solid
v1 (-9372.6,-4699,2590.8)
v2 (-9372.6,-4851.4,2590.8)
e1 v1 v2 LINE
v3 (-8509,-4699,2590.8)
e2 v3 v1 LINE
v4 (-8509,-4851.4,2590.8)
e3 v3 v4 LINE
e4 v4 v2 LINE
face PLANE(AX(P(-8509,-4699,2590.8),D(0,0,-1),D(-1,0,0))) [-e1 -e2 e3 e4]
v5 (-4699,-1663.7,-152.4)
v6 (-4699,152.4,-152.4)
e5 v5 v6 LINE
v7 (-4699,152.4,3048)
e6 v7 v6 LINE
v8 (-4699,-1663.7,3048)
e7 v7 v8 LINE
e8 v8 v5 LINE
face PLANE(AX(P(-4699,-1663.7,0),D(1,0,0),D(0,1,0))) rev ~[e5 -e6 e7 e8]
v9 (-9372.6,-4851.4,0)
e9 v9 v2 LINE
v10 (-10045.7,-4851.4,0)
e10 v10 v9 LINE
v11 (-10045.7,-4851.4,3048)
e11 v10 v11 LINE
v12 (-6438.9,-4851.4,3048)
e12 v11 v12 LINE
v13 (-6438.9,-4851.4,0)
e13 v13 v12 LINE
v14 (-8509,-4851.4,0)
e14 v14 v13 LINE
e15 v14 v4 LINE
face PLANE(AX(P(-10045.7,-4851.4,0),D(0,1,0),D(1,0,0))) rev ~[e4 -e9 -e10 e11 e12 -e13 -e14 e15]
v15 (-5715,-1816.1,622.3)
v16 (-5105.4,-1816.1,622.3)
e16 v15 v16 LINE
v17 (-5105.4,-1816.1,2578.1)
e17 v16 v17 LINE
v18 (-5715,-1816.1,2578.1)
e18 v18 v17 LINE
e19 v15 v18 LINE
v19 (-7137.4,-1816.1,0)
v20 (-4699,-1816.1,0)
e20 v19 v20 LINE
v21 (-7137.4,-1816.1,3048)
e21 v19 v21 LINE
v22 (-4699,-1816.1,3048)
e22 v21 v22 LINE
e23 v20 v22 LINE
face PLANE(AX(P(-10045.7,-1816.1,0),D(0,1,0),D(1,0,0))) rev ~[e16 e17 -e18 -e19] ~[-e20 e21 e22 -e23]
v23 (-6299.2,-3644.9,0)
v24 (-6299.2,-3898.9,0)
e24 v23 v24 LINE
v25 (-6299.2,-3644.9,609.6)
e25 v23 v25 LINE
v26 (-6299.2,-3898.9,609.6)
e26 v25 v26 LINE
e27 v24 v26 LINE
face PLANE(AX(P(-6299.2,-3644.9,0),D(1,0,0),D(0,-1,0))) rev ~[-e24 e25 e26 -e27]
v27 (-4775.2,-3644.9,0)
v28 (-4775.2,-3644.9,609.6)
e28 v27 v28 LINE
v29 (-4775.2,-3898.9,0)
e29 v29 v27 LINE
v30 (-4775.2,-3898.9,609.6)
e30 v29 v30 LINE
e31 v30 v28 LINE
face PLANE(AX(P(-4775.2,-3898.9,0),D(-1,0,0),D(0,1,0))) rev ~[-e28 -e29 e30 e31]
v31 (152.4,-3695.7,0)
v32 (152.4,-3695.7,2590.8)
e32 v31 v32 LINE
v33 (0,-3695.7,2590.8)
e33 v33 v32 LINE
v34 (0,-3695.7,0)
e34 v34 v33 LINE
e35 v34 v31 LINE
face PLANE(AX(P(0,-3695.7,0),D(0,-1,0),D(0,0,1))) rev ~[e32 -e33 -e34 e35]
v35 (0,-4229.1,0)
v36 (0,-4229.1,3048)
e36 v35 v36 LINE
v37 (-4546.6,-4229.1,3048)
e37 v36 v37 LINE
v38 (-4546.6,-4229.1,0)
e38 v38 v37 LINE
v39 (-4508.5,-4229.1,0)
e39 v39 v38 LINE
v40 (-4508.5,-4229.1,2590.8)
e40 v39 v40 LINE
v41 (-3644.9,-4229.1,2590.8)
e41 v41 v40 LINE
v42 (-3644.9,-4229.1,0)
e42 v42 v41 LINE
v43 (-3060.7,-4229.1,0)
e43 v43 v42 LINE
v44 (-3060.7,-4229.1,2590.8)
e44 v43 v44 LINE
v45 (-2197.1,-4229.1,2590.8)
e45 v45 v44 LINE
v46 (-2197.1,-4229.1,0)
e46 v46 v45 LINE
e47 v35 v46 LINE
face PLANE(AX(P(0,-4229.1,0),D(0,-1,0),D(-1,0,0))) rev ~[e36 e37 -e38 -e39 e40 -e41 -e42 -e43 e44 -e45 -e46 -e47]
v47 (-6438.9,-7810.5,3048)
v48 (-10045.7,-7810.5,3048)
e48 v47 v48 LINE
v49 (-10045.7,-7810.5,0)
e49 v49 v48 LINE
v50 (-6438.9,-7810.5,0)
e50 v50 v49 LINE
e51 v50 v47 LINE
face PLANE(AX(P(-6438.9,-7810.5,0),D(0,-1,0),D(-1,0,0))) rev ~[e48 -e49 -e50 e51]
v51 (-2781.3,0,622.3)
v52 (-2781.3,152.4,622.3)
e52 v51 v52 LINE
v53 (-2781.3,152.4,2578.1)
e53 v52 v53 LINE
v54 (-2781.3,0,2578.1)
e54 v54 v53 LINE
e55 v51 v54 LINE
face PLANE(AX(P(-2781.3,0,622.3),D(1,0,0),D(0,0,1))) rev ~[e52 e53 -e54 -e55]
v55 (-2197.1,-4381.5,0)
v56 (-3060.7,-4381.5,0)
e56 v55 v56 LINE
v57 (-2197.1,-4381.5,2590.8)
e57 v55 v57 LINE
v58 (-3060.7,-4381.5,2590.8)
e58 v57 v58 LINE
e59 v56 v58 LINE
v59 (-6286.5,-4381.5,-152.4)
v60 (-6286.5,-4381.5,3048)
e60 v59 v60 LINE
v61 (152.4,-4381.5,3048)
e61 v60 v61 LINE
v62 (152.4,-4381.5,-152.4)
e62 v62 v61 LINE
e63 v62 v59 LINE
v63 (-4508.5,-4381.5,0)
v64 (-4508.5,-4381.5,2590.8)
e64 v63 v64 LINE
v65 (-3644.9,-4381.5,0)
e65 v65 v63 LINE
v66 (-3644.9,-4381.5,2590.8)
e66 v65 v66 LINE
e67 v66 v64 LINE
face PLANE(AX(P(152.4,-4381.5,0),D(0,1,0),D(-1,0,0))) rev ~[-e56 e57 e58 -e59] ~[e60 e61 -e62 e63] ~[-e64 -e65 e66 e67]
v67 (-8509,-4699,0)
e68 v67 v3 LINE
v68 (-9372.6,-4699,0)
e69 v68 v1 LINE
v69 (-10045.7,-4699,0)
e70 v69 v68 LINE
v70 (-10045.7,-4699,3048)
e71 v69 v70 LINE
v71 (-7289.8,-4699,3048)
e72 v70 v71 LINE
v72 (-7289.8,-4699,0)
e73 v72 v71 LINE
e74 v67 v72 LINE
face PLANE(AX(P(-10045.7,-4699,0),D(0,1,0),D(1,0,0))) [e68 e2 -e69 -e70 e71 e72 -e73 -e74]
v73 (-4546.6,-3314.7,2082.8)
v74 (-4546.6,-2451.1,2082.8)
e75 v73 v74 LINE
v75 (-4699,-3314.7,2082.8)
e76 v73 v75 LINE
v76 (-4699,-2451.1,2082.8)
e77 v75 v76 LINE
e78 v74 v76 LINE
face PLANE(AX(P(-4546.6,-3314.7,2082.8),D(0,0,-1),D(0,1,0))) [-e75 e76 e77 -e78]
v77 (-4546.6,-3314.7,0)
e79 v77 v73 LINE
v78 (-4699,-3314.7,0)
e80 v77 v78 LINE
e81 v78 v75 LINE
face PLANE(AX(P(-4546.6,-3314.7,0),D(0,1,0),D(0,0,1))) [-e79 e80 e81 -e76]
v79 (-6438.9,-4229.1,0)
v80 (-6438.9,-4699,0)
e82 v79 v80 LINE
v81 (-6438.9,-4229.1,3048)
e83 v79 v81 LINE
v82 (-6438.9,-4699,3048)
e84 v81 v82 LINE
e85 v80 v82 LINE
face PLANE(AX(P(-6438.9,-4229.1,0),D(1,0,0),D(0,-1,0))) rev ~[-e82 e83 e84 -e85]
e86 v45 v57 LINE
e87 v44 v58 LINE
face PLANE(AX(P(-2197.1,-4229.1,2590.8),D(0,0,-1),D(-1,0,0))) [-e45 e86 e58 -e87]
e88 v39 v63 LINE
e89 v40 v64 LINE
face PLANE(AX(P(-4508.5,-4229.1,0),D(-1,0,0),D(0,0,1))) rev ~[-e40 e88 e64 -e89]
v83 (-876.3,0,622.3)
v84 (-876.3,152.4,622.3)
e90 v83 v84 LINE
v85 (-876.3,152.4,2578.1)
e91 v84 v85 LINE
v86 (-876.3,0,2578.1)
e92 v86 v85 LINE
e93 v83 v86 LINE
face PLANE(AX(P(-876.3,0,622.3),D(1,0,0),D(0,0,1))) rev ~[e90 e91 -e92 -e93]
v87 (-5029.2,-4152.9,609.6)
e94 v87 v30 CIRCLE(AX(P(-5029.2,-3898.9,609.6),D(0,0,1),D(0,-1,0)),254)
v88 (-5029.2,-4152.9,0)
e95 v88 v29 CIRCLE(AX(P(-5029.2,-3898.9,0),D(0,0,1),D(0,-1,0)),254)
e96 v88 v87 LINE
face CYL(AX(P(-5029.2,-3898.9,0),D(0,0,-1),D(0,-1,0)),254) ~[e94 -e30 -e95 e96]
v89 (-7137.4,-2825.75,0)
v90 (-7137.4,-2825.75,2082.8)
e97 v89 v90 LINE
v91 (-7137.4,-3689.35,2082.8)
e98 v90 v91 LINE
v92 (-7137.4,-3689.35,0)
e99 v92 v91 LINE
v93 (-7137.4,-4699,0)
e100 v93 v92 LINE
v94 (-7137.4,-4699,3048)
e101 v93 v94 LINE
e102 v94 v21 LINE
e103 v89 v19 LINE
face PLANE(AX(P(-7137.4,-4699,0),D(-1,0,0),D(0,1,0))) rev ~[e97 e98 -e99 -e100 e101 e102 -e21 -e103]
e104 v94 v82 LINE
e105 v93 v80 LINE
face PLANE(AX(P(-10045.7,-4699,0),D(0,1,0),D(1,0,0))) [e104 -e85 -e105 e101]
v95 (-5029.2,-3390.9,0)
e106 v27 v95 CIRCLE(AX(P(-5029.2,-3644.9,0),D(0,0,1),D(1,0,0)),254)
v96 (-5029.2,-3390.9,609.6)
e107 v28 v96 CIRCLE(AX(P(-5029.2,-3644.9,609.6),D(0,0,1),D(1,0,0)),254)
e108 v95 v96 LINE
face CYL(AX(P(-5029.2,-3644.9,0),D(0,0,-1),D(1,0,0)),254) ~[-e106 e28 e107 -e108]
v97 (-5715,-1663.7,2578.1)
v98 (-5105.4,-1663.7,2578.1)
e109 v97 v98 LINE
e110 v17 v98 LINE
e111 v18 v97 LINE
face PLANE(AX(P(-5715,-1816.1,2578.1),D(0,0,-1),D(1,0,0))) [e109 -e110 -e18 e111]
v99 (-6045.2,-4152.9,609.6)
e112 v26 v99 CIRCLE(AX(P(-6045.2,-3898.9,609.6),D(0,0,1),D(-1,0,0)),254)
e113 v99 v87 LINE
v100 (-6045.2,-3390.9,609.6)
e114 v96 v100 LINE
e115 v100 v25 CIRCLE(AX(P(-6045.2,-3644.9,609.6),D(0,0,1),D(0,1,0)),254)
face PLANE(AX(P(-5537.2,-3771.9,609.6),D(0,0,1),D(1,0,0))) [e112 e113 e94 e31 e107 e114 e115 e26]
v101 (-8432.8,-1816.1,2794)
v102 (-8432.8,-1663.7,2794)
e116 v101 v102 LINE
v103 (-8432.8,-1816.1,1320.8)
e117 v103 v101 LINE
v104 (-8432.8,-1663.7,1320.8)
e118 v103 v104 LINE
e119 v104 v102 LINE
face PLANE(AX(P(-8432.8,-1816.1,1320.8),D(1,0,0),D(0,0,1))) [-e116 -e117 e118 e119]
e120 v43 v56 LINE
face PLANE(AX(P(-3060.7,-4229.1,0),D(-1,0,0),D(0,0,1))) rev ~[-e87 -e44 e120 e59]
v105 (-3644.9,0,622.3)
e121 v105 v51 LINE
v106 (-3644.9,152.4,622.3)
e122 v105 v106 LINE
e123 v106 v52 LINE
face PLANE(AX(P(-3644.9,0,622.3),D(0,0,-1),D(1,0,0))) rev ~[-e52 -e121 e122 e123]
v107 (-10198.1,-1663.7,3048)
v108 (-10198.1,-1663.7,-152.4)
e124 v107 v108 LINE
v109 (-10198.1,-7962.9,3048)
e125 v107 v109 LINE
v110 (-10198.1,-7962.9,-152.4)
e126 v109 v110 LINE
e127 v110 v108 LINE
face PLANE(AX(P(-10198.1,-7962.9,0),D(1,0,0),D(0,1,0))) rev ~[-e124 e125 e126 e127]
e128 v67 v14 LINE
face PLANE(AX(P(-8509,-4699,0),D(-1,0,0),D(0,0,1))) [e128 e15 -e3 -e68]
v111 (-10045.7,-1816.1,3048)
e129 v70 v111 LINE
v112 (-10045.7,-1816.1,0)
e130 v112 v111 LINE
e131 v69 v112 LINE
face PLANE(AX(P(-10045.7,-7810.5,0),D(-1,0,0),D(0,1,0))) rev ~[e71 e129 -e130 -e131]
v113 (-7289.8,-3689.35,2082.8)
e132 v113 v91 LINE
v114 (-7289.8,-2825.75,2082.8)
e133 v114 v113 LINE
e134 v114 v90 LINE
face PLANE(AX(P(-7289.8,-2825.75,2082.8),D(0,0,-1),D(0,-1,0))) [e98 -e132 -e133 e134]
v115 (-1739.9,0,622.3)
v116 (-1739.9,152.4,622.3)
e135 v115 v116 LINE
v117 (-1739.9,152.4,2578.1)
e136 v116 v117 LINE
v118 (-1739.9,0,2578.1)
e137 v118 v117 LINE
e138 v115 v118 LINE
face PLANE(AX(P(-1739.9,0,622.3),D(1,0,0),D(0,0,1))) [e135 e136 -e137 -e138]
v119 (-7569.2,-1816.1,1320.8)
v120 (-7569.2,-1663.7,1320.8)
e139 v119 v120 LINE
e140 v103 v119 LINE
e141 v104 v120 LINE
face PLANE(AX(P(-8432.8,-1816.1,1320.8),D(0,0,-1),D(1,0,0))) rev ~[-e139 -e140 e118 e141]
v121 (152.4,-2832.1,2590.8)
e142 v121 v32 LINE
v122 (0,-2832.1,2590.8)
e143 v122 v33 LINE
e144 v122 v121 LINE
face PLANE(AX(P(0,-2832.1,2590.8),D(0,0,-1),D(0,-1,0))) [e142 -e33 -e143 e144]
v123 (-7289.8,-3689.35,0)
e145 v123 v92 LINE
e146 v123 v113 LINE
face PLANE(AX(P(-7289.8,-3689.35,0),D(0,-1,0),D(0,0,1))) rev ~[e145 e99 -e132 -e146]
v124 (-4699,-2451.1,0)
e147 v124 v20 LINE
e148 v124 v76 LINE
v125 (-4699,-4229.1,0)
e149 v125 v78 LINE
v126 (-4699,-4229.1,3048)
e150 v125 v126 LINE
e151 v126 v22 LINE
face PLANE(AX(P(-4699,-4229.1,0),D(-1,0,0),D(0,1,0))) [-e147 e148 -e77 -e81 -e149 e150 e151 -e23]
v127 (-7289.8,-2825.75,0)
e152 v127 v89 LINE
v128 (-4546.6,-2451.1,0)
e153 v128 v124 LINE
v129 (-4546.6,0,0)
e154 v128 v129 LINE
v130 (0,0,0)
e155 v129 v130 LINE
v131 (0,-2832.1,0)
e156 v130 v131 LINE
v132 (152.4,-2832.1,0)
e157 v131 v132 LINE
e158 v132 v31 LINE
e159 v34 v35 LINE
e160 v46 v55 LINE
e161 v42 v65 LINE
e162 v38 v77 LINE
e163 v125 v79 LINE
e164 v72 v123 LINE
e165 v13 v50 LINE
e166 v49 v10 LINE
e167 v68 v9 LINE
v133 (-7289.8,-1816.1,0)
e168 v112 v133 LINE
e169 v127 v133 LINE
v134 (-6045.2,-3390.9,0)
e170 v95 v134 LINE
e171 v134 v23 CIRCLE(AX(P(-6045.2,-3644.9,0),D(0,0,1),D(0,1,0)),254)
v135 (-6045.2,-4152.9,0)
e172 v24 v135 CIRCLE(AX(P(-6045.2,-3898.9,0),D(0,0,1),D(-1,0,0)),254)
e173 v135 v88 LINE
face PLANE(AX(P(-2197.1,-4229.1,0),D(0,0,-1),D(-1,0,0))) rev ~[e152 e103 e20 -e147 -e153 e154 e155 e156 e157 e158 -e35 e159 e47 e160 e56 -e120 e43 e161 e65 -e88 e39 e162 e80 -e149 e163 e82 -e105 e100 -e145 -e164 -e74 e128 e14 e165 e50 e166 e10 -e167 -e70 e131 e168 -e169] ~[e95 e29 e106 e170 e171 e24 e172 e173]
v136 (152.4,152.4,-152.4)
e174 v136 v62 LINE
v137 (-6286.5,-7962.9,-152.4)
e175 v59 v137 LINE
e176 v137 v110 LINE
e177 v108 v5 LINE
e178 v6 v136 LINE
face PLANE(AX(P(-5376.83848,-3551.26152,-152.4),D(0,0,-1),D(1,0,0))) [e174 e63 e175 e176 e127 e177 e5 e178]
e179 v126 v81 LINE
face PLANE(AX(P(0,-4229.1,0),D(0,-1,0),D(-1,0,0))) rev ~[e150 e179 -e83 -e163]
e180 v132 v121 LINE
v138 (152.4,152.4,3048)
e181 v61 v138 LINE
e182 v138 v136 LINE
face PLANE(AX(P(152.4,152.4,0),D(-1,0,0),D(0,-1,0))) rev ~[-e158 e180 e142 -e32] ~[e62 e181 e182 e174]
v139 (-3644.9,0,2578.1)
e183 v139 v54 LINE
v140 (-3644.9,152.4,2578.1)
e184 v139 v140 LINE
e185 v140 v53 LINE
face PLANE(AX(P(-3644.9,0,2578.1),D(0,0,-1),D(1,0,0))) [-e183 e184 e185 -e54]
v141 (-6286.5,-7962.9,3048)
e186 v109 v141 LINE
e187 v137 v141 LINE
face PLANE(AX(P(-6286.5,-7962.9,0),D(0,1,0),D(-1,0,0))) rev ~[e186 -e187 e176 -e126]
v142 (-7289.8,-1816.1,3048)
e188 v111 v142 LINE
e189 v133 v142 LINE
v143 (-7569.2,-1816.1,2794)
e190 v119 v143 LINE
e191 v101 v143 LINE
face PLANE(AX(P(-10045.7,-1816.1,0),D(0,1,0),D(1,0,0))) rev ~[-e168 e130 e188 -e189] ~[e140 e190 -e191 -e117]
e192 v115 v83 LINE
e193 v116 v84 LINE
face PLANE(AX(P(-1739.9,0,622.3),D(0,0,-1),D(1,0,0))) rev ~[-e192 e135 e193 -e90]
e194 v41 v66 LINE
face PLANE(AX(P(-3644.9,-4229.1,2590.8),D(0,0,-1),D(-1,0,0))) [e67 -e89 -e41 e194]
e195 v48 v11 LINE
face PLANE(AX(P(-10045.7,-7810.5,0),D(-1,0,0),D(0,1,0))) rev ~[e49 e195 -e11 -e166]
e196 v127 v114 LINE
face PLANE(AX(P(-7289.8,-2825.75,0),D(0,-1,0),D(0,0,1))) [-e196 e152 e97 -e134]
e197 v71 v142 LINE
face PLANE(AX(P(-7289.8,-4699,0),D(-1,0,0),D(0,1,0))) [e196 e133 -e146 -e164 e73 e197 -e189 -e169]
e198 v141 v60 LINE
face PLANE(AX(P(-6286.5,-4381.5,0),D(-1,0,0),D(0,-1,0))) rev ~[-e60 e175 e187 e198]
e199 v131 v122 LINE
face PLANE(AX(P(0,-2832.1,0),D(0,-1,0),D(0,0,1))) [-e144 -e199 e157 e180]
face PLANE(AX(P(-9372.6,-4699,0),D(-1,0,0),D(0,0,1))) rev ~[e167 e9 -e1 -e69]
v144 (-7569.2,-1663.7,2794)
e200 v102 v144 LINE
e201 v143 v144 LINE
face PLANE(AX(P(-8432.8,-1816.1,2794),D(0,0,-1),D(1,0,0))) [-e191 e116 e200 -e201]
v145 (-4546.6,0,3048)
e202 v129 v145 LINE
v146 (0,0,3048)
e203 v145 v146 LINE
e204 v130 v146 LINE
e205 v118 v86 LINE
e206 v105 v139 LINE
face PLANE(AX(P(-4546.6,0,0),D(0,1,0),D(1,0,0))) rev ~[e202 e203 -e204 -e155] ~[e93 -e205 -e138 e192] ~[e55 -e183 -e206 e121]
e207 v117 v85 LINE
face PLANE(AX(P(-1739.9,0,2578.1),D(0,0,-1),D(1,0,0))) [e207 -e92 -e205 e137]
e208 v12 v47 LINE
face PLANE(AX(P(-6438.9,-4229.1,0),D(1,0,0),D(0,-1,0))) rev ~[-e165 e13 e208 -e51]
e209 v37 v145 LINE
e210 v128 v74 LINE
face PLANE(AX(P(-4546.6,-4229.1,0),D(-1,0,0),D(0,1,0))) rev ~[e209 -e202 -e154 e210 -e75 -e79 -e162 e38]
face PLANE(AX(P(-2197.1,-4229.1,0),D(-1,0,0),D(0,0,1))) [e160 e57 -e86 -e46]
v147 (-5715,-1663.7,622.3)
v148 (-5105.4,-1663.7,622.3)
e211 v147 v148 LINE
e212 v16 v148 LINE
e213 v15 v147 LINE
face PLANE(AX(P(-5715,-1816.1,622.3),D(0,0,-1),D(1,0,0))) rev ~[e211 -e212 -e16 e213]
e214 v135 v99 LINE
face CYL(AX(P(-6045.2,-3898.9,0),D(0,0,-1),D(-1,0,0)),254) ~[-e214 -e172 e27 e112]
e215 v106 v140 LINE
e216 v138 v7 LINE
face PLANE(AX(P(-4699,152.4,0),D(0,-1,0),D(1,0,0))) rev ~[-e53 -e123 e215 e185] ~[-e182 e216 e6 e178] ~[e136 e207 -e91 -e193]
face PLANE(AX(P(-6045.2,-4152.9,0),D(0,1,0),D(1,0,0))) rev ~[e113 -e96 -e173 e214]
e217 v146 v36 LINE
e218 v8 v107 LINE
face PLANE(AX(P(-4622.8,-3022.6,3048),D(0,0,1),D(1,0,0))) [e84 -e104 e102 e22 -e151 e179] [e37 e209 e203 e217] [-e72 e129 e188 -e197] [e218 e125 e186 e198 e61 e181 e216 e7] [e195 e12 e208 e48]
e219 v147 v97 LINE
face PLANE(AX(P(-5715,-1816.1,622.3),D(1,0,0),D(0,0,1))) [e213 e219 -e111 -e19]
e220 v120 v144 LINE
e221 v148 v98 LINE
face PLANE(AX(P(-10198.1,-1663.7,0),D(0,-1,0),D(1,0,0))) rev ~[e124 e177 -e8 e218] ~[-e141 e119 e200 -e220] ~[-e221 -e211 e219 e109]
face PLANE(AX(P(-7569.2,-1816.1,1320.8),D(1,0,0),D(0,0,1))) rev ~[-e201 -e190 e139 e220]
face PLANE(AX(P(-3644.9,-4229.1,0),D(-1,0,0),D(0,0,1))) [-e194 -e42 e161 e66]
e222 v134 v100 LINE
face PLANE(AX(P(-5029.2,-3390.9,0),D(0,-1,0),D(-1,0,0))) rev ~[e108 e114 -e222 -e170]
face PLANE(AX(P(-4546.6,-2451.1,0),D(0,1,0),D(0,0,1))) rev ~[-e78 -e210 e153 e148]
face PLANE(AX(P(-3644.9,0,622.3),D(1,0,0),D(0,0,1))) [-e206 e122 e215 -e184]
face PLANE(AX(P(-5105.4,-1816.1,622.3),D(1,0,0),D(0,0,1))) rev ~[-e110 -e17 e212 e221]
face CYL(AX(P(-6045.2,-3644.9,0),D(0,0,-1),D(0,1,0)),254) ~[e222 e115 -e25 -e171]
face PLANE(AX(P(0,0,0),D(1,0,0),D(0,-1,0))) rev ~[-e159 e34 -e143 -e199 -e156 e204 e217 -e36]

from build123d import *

# Parameters (mm, degrees)
F1_DEPTH  = 3048
F3_DEPTH  = 152.4
F4_W      = 863.6
F4_H      = 2590.8
F5_DEPTH  = 3733.801
F6_W      = 863.6
F6_H      = 1955.8
F7_DEPTH  = 152.401
F8_W      = 863.6
F8_H      = 2590.8
F9_DEPTH  = 152.401
F10_W     = 152.4
F10_H     = 2413
F10_W_2   = 3606.8
F10_H_2   = 152.4
F11_DEPTH = 3048
F12_W     = 609.6
F12_H     = 1955.8
F12_W_2   = 863.6
F12_H_2   = 1473.2
F13_DEPTH = 1968.501
F14_W     = 152.4
F14_H     = 2882.9
F15_DEPTH = 3048
F16_W     = 863.6
F16_H     = 2082.8
F17_DEPTH = 152.4
F18_W     = 863.6
F18_H     = 2590.8
F19_DEPTH = 152.4
F20_W     = 863.6
F20_H     = 2082.8
F21_DEPTH = 152.4
F23_DEPTH = 609.6


with BuildPart() as f1:
    # F0 (on Top) → F1 (new body)
    with BuildSketch(Plane.XY):
        Polygon((152.4, 152.4), (-4699, 152.4), (-4699, -1663.7), (-10198.1, -1663.7), (-10198.1, -7962.9), (-6286.5, -7962.9), (-6286.5, -4381.5), (152.4, -4381.5), align=None)
        Polygon((-4546.6, 0), (0, 0), (0, -4229.1), (-6438.9, -4229.1), (-6438.9, -7810.5), (-10045.7, -7810.5), (-10045.7, -1816.1), (-4546.6, -1816.1), align=None, mode=Mode.SUBTRACT)
    extrude(amount=F1_DEPTH)

    # F2 (on face) → F3 (join)
    with BuildSketch(Plane(origin=(0, 0, 0), x_dir=(1, 0, 0), z_dir=(0, 0, -1))):
        Polygon((-6286.5, 7962.9), (-10198.1, 7962.9), (-10198.1, 1663.7), (-4699, 1663.7), (-4699, -152.4), (152.4, -152.4), (152.4, 4381.5), (-6286.5, 4381.5), align=None)
    extrude(amount=F3_DEPTH)

    # F4 (on face) → F5 (cut, through all)
    with BuildSketch(Plane(origin=(0, -4229.1, 0), x_dir=(-1, 0, 0), z_dir=(0, 1, 0))):
        with Locations((2628.9, 1295.4)):
            Rectangle(F4_W, F4_H)
        with Locations((4076.7, 1295.4)):
            Rectangle(F4_W, F4_H)
    extrude(amount=-F5_DEPTH, mode=Mode.SUBTRACT)

    # F6 (on face) → F7 (cut, through all)
    with BuildSketch(Plane.XZ):
        with Locations((-3213.1, 1600.2)):
            Rectangle(F6_W, F6_H)
        with Locations((-1308.1, 1600.2)):
            Rectangle(F6_W, F6_H)
    extrude(amount=-F7_DEPTH, mode=Mode.SUBTRACT)

    # F8 (on face) → F9 (cut, through all)
    with BuildSketch(Plane(origin=(0, 0, 0), x_dir=(0, -1, 0), z_dir=(-1, 0, 0))):
        with Locations((3263.9, 1295.4)):
            Rectangle(F8_W, F8_H)
    extrude(amount=-F9_DEPTH, mode=Mode.SUBTRACT)

    # F10 (on face) → F11 (join, through all)
    with BuildSketch(Plane.XY):
        with Locations((-4622.8, -3022.6)):
            Rectangle(F10_W, F10_H)
        with Locations((-8242.3, -4775.2)):
            Rectangle(F10_W_2, F10_H_2)
    extrude(amount=F11_DEPTH)

    # F12 (on face) → F13 (cut, through all)
    with BuildSketch(Plane.XZ.offset(1816.1)):
        with Locations((-5410.2, 1600.2)):
            Rectangle(F12_W, F12_H)
        with Locations((-8001, 2057.4)):
            Rectangle(F12_W_2, F12_H_2)
    extrude(amount=-F13_DEPTH, mode=Mode.SUBTRACT)

    # F14 (on face) → F15 (join, through all)
    with BuildSketch(Plane.XY):
        with Locations((-7213.6, -3257.55)):
            Rectangle(F14_W, F14_H)
    extrude(amount=F15_DEPTH)

    # F16 (on face) → F17 (cut, through all)
    with BuildSketch(Plane.YZ.offset(-4546.6)):
        with Locations((-2882.9, 1041.4)):
            Rectangle(F16_W, F16_H)
    extrude(amount=-F17_DEPTH, mode=Mode.SUBTRACT)

    # F18 (on face) → F19 (cut, through all)
    with BuildSketch(Plane(origin=(0, -4699, 0), x_dir=(-1, 0, 0), z_dir=(0, 1, 0))):
        with Locations((8940.8, 1295.4)):
            Rectangle(F18_W, F18_H)
    extrude(amount=-F19_DEPTH, mode=Mode.SUBTRACT)

    # F20 (on face) → F21 (cut, through all)
    with BuildSketch(Plane(origin=(-7289.8, 0, 0), x_dir=(0, -1, 0), z_dir=(-1, 0, 0))):
        with Locations((3257.55, 1041.4)):
            Rectangle(F20_W, F20_H)
    extrude(amount=-F21_DEPTH, mode=Mode.SUBTRACT)

    # F22 (on face) → F23 (join)
    with BuildSketch(Plane.XY):
        with BuildLine():
            ThreePointArc((-6299.2, -3898.9), (-6224.8051224214, -4078.5051224214), (-6045.2, -4152.9))
            Line((-6045.2, -4152.9), (-5029.2, -4152.9))
            ThreePointArc((-5029.2, -4152.9), (-4849.5948775786, -4078.5051224214), (-4775.2, -3898.9))
            Line((-4775.2, -3898.9), (-4775.2, -3644.9))
            ThreePointArc((-4775.2, -3644.9), (-4849.5948775786, -3465.2948775786), (-5029.2, -3390.9))
            Line((-5029.2, -3390.9), (-6045.2, -3390.9))
            ThreePointArc((-6045.2, -3390.9), (-6224.8051224214, -3465.2948775786), (-6299.2, -3644.9))
            Line((-6299.2, -3644.9), (-6299.2, -3898.9))
        make_face()
    extrude(amount=F23_DEPTH)


solid = f1.part
